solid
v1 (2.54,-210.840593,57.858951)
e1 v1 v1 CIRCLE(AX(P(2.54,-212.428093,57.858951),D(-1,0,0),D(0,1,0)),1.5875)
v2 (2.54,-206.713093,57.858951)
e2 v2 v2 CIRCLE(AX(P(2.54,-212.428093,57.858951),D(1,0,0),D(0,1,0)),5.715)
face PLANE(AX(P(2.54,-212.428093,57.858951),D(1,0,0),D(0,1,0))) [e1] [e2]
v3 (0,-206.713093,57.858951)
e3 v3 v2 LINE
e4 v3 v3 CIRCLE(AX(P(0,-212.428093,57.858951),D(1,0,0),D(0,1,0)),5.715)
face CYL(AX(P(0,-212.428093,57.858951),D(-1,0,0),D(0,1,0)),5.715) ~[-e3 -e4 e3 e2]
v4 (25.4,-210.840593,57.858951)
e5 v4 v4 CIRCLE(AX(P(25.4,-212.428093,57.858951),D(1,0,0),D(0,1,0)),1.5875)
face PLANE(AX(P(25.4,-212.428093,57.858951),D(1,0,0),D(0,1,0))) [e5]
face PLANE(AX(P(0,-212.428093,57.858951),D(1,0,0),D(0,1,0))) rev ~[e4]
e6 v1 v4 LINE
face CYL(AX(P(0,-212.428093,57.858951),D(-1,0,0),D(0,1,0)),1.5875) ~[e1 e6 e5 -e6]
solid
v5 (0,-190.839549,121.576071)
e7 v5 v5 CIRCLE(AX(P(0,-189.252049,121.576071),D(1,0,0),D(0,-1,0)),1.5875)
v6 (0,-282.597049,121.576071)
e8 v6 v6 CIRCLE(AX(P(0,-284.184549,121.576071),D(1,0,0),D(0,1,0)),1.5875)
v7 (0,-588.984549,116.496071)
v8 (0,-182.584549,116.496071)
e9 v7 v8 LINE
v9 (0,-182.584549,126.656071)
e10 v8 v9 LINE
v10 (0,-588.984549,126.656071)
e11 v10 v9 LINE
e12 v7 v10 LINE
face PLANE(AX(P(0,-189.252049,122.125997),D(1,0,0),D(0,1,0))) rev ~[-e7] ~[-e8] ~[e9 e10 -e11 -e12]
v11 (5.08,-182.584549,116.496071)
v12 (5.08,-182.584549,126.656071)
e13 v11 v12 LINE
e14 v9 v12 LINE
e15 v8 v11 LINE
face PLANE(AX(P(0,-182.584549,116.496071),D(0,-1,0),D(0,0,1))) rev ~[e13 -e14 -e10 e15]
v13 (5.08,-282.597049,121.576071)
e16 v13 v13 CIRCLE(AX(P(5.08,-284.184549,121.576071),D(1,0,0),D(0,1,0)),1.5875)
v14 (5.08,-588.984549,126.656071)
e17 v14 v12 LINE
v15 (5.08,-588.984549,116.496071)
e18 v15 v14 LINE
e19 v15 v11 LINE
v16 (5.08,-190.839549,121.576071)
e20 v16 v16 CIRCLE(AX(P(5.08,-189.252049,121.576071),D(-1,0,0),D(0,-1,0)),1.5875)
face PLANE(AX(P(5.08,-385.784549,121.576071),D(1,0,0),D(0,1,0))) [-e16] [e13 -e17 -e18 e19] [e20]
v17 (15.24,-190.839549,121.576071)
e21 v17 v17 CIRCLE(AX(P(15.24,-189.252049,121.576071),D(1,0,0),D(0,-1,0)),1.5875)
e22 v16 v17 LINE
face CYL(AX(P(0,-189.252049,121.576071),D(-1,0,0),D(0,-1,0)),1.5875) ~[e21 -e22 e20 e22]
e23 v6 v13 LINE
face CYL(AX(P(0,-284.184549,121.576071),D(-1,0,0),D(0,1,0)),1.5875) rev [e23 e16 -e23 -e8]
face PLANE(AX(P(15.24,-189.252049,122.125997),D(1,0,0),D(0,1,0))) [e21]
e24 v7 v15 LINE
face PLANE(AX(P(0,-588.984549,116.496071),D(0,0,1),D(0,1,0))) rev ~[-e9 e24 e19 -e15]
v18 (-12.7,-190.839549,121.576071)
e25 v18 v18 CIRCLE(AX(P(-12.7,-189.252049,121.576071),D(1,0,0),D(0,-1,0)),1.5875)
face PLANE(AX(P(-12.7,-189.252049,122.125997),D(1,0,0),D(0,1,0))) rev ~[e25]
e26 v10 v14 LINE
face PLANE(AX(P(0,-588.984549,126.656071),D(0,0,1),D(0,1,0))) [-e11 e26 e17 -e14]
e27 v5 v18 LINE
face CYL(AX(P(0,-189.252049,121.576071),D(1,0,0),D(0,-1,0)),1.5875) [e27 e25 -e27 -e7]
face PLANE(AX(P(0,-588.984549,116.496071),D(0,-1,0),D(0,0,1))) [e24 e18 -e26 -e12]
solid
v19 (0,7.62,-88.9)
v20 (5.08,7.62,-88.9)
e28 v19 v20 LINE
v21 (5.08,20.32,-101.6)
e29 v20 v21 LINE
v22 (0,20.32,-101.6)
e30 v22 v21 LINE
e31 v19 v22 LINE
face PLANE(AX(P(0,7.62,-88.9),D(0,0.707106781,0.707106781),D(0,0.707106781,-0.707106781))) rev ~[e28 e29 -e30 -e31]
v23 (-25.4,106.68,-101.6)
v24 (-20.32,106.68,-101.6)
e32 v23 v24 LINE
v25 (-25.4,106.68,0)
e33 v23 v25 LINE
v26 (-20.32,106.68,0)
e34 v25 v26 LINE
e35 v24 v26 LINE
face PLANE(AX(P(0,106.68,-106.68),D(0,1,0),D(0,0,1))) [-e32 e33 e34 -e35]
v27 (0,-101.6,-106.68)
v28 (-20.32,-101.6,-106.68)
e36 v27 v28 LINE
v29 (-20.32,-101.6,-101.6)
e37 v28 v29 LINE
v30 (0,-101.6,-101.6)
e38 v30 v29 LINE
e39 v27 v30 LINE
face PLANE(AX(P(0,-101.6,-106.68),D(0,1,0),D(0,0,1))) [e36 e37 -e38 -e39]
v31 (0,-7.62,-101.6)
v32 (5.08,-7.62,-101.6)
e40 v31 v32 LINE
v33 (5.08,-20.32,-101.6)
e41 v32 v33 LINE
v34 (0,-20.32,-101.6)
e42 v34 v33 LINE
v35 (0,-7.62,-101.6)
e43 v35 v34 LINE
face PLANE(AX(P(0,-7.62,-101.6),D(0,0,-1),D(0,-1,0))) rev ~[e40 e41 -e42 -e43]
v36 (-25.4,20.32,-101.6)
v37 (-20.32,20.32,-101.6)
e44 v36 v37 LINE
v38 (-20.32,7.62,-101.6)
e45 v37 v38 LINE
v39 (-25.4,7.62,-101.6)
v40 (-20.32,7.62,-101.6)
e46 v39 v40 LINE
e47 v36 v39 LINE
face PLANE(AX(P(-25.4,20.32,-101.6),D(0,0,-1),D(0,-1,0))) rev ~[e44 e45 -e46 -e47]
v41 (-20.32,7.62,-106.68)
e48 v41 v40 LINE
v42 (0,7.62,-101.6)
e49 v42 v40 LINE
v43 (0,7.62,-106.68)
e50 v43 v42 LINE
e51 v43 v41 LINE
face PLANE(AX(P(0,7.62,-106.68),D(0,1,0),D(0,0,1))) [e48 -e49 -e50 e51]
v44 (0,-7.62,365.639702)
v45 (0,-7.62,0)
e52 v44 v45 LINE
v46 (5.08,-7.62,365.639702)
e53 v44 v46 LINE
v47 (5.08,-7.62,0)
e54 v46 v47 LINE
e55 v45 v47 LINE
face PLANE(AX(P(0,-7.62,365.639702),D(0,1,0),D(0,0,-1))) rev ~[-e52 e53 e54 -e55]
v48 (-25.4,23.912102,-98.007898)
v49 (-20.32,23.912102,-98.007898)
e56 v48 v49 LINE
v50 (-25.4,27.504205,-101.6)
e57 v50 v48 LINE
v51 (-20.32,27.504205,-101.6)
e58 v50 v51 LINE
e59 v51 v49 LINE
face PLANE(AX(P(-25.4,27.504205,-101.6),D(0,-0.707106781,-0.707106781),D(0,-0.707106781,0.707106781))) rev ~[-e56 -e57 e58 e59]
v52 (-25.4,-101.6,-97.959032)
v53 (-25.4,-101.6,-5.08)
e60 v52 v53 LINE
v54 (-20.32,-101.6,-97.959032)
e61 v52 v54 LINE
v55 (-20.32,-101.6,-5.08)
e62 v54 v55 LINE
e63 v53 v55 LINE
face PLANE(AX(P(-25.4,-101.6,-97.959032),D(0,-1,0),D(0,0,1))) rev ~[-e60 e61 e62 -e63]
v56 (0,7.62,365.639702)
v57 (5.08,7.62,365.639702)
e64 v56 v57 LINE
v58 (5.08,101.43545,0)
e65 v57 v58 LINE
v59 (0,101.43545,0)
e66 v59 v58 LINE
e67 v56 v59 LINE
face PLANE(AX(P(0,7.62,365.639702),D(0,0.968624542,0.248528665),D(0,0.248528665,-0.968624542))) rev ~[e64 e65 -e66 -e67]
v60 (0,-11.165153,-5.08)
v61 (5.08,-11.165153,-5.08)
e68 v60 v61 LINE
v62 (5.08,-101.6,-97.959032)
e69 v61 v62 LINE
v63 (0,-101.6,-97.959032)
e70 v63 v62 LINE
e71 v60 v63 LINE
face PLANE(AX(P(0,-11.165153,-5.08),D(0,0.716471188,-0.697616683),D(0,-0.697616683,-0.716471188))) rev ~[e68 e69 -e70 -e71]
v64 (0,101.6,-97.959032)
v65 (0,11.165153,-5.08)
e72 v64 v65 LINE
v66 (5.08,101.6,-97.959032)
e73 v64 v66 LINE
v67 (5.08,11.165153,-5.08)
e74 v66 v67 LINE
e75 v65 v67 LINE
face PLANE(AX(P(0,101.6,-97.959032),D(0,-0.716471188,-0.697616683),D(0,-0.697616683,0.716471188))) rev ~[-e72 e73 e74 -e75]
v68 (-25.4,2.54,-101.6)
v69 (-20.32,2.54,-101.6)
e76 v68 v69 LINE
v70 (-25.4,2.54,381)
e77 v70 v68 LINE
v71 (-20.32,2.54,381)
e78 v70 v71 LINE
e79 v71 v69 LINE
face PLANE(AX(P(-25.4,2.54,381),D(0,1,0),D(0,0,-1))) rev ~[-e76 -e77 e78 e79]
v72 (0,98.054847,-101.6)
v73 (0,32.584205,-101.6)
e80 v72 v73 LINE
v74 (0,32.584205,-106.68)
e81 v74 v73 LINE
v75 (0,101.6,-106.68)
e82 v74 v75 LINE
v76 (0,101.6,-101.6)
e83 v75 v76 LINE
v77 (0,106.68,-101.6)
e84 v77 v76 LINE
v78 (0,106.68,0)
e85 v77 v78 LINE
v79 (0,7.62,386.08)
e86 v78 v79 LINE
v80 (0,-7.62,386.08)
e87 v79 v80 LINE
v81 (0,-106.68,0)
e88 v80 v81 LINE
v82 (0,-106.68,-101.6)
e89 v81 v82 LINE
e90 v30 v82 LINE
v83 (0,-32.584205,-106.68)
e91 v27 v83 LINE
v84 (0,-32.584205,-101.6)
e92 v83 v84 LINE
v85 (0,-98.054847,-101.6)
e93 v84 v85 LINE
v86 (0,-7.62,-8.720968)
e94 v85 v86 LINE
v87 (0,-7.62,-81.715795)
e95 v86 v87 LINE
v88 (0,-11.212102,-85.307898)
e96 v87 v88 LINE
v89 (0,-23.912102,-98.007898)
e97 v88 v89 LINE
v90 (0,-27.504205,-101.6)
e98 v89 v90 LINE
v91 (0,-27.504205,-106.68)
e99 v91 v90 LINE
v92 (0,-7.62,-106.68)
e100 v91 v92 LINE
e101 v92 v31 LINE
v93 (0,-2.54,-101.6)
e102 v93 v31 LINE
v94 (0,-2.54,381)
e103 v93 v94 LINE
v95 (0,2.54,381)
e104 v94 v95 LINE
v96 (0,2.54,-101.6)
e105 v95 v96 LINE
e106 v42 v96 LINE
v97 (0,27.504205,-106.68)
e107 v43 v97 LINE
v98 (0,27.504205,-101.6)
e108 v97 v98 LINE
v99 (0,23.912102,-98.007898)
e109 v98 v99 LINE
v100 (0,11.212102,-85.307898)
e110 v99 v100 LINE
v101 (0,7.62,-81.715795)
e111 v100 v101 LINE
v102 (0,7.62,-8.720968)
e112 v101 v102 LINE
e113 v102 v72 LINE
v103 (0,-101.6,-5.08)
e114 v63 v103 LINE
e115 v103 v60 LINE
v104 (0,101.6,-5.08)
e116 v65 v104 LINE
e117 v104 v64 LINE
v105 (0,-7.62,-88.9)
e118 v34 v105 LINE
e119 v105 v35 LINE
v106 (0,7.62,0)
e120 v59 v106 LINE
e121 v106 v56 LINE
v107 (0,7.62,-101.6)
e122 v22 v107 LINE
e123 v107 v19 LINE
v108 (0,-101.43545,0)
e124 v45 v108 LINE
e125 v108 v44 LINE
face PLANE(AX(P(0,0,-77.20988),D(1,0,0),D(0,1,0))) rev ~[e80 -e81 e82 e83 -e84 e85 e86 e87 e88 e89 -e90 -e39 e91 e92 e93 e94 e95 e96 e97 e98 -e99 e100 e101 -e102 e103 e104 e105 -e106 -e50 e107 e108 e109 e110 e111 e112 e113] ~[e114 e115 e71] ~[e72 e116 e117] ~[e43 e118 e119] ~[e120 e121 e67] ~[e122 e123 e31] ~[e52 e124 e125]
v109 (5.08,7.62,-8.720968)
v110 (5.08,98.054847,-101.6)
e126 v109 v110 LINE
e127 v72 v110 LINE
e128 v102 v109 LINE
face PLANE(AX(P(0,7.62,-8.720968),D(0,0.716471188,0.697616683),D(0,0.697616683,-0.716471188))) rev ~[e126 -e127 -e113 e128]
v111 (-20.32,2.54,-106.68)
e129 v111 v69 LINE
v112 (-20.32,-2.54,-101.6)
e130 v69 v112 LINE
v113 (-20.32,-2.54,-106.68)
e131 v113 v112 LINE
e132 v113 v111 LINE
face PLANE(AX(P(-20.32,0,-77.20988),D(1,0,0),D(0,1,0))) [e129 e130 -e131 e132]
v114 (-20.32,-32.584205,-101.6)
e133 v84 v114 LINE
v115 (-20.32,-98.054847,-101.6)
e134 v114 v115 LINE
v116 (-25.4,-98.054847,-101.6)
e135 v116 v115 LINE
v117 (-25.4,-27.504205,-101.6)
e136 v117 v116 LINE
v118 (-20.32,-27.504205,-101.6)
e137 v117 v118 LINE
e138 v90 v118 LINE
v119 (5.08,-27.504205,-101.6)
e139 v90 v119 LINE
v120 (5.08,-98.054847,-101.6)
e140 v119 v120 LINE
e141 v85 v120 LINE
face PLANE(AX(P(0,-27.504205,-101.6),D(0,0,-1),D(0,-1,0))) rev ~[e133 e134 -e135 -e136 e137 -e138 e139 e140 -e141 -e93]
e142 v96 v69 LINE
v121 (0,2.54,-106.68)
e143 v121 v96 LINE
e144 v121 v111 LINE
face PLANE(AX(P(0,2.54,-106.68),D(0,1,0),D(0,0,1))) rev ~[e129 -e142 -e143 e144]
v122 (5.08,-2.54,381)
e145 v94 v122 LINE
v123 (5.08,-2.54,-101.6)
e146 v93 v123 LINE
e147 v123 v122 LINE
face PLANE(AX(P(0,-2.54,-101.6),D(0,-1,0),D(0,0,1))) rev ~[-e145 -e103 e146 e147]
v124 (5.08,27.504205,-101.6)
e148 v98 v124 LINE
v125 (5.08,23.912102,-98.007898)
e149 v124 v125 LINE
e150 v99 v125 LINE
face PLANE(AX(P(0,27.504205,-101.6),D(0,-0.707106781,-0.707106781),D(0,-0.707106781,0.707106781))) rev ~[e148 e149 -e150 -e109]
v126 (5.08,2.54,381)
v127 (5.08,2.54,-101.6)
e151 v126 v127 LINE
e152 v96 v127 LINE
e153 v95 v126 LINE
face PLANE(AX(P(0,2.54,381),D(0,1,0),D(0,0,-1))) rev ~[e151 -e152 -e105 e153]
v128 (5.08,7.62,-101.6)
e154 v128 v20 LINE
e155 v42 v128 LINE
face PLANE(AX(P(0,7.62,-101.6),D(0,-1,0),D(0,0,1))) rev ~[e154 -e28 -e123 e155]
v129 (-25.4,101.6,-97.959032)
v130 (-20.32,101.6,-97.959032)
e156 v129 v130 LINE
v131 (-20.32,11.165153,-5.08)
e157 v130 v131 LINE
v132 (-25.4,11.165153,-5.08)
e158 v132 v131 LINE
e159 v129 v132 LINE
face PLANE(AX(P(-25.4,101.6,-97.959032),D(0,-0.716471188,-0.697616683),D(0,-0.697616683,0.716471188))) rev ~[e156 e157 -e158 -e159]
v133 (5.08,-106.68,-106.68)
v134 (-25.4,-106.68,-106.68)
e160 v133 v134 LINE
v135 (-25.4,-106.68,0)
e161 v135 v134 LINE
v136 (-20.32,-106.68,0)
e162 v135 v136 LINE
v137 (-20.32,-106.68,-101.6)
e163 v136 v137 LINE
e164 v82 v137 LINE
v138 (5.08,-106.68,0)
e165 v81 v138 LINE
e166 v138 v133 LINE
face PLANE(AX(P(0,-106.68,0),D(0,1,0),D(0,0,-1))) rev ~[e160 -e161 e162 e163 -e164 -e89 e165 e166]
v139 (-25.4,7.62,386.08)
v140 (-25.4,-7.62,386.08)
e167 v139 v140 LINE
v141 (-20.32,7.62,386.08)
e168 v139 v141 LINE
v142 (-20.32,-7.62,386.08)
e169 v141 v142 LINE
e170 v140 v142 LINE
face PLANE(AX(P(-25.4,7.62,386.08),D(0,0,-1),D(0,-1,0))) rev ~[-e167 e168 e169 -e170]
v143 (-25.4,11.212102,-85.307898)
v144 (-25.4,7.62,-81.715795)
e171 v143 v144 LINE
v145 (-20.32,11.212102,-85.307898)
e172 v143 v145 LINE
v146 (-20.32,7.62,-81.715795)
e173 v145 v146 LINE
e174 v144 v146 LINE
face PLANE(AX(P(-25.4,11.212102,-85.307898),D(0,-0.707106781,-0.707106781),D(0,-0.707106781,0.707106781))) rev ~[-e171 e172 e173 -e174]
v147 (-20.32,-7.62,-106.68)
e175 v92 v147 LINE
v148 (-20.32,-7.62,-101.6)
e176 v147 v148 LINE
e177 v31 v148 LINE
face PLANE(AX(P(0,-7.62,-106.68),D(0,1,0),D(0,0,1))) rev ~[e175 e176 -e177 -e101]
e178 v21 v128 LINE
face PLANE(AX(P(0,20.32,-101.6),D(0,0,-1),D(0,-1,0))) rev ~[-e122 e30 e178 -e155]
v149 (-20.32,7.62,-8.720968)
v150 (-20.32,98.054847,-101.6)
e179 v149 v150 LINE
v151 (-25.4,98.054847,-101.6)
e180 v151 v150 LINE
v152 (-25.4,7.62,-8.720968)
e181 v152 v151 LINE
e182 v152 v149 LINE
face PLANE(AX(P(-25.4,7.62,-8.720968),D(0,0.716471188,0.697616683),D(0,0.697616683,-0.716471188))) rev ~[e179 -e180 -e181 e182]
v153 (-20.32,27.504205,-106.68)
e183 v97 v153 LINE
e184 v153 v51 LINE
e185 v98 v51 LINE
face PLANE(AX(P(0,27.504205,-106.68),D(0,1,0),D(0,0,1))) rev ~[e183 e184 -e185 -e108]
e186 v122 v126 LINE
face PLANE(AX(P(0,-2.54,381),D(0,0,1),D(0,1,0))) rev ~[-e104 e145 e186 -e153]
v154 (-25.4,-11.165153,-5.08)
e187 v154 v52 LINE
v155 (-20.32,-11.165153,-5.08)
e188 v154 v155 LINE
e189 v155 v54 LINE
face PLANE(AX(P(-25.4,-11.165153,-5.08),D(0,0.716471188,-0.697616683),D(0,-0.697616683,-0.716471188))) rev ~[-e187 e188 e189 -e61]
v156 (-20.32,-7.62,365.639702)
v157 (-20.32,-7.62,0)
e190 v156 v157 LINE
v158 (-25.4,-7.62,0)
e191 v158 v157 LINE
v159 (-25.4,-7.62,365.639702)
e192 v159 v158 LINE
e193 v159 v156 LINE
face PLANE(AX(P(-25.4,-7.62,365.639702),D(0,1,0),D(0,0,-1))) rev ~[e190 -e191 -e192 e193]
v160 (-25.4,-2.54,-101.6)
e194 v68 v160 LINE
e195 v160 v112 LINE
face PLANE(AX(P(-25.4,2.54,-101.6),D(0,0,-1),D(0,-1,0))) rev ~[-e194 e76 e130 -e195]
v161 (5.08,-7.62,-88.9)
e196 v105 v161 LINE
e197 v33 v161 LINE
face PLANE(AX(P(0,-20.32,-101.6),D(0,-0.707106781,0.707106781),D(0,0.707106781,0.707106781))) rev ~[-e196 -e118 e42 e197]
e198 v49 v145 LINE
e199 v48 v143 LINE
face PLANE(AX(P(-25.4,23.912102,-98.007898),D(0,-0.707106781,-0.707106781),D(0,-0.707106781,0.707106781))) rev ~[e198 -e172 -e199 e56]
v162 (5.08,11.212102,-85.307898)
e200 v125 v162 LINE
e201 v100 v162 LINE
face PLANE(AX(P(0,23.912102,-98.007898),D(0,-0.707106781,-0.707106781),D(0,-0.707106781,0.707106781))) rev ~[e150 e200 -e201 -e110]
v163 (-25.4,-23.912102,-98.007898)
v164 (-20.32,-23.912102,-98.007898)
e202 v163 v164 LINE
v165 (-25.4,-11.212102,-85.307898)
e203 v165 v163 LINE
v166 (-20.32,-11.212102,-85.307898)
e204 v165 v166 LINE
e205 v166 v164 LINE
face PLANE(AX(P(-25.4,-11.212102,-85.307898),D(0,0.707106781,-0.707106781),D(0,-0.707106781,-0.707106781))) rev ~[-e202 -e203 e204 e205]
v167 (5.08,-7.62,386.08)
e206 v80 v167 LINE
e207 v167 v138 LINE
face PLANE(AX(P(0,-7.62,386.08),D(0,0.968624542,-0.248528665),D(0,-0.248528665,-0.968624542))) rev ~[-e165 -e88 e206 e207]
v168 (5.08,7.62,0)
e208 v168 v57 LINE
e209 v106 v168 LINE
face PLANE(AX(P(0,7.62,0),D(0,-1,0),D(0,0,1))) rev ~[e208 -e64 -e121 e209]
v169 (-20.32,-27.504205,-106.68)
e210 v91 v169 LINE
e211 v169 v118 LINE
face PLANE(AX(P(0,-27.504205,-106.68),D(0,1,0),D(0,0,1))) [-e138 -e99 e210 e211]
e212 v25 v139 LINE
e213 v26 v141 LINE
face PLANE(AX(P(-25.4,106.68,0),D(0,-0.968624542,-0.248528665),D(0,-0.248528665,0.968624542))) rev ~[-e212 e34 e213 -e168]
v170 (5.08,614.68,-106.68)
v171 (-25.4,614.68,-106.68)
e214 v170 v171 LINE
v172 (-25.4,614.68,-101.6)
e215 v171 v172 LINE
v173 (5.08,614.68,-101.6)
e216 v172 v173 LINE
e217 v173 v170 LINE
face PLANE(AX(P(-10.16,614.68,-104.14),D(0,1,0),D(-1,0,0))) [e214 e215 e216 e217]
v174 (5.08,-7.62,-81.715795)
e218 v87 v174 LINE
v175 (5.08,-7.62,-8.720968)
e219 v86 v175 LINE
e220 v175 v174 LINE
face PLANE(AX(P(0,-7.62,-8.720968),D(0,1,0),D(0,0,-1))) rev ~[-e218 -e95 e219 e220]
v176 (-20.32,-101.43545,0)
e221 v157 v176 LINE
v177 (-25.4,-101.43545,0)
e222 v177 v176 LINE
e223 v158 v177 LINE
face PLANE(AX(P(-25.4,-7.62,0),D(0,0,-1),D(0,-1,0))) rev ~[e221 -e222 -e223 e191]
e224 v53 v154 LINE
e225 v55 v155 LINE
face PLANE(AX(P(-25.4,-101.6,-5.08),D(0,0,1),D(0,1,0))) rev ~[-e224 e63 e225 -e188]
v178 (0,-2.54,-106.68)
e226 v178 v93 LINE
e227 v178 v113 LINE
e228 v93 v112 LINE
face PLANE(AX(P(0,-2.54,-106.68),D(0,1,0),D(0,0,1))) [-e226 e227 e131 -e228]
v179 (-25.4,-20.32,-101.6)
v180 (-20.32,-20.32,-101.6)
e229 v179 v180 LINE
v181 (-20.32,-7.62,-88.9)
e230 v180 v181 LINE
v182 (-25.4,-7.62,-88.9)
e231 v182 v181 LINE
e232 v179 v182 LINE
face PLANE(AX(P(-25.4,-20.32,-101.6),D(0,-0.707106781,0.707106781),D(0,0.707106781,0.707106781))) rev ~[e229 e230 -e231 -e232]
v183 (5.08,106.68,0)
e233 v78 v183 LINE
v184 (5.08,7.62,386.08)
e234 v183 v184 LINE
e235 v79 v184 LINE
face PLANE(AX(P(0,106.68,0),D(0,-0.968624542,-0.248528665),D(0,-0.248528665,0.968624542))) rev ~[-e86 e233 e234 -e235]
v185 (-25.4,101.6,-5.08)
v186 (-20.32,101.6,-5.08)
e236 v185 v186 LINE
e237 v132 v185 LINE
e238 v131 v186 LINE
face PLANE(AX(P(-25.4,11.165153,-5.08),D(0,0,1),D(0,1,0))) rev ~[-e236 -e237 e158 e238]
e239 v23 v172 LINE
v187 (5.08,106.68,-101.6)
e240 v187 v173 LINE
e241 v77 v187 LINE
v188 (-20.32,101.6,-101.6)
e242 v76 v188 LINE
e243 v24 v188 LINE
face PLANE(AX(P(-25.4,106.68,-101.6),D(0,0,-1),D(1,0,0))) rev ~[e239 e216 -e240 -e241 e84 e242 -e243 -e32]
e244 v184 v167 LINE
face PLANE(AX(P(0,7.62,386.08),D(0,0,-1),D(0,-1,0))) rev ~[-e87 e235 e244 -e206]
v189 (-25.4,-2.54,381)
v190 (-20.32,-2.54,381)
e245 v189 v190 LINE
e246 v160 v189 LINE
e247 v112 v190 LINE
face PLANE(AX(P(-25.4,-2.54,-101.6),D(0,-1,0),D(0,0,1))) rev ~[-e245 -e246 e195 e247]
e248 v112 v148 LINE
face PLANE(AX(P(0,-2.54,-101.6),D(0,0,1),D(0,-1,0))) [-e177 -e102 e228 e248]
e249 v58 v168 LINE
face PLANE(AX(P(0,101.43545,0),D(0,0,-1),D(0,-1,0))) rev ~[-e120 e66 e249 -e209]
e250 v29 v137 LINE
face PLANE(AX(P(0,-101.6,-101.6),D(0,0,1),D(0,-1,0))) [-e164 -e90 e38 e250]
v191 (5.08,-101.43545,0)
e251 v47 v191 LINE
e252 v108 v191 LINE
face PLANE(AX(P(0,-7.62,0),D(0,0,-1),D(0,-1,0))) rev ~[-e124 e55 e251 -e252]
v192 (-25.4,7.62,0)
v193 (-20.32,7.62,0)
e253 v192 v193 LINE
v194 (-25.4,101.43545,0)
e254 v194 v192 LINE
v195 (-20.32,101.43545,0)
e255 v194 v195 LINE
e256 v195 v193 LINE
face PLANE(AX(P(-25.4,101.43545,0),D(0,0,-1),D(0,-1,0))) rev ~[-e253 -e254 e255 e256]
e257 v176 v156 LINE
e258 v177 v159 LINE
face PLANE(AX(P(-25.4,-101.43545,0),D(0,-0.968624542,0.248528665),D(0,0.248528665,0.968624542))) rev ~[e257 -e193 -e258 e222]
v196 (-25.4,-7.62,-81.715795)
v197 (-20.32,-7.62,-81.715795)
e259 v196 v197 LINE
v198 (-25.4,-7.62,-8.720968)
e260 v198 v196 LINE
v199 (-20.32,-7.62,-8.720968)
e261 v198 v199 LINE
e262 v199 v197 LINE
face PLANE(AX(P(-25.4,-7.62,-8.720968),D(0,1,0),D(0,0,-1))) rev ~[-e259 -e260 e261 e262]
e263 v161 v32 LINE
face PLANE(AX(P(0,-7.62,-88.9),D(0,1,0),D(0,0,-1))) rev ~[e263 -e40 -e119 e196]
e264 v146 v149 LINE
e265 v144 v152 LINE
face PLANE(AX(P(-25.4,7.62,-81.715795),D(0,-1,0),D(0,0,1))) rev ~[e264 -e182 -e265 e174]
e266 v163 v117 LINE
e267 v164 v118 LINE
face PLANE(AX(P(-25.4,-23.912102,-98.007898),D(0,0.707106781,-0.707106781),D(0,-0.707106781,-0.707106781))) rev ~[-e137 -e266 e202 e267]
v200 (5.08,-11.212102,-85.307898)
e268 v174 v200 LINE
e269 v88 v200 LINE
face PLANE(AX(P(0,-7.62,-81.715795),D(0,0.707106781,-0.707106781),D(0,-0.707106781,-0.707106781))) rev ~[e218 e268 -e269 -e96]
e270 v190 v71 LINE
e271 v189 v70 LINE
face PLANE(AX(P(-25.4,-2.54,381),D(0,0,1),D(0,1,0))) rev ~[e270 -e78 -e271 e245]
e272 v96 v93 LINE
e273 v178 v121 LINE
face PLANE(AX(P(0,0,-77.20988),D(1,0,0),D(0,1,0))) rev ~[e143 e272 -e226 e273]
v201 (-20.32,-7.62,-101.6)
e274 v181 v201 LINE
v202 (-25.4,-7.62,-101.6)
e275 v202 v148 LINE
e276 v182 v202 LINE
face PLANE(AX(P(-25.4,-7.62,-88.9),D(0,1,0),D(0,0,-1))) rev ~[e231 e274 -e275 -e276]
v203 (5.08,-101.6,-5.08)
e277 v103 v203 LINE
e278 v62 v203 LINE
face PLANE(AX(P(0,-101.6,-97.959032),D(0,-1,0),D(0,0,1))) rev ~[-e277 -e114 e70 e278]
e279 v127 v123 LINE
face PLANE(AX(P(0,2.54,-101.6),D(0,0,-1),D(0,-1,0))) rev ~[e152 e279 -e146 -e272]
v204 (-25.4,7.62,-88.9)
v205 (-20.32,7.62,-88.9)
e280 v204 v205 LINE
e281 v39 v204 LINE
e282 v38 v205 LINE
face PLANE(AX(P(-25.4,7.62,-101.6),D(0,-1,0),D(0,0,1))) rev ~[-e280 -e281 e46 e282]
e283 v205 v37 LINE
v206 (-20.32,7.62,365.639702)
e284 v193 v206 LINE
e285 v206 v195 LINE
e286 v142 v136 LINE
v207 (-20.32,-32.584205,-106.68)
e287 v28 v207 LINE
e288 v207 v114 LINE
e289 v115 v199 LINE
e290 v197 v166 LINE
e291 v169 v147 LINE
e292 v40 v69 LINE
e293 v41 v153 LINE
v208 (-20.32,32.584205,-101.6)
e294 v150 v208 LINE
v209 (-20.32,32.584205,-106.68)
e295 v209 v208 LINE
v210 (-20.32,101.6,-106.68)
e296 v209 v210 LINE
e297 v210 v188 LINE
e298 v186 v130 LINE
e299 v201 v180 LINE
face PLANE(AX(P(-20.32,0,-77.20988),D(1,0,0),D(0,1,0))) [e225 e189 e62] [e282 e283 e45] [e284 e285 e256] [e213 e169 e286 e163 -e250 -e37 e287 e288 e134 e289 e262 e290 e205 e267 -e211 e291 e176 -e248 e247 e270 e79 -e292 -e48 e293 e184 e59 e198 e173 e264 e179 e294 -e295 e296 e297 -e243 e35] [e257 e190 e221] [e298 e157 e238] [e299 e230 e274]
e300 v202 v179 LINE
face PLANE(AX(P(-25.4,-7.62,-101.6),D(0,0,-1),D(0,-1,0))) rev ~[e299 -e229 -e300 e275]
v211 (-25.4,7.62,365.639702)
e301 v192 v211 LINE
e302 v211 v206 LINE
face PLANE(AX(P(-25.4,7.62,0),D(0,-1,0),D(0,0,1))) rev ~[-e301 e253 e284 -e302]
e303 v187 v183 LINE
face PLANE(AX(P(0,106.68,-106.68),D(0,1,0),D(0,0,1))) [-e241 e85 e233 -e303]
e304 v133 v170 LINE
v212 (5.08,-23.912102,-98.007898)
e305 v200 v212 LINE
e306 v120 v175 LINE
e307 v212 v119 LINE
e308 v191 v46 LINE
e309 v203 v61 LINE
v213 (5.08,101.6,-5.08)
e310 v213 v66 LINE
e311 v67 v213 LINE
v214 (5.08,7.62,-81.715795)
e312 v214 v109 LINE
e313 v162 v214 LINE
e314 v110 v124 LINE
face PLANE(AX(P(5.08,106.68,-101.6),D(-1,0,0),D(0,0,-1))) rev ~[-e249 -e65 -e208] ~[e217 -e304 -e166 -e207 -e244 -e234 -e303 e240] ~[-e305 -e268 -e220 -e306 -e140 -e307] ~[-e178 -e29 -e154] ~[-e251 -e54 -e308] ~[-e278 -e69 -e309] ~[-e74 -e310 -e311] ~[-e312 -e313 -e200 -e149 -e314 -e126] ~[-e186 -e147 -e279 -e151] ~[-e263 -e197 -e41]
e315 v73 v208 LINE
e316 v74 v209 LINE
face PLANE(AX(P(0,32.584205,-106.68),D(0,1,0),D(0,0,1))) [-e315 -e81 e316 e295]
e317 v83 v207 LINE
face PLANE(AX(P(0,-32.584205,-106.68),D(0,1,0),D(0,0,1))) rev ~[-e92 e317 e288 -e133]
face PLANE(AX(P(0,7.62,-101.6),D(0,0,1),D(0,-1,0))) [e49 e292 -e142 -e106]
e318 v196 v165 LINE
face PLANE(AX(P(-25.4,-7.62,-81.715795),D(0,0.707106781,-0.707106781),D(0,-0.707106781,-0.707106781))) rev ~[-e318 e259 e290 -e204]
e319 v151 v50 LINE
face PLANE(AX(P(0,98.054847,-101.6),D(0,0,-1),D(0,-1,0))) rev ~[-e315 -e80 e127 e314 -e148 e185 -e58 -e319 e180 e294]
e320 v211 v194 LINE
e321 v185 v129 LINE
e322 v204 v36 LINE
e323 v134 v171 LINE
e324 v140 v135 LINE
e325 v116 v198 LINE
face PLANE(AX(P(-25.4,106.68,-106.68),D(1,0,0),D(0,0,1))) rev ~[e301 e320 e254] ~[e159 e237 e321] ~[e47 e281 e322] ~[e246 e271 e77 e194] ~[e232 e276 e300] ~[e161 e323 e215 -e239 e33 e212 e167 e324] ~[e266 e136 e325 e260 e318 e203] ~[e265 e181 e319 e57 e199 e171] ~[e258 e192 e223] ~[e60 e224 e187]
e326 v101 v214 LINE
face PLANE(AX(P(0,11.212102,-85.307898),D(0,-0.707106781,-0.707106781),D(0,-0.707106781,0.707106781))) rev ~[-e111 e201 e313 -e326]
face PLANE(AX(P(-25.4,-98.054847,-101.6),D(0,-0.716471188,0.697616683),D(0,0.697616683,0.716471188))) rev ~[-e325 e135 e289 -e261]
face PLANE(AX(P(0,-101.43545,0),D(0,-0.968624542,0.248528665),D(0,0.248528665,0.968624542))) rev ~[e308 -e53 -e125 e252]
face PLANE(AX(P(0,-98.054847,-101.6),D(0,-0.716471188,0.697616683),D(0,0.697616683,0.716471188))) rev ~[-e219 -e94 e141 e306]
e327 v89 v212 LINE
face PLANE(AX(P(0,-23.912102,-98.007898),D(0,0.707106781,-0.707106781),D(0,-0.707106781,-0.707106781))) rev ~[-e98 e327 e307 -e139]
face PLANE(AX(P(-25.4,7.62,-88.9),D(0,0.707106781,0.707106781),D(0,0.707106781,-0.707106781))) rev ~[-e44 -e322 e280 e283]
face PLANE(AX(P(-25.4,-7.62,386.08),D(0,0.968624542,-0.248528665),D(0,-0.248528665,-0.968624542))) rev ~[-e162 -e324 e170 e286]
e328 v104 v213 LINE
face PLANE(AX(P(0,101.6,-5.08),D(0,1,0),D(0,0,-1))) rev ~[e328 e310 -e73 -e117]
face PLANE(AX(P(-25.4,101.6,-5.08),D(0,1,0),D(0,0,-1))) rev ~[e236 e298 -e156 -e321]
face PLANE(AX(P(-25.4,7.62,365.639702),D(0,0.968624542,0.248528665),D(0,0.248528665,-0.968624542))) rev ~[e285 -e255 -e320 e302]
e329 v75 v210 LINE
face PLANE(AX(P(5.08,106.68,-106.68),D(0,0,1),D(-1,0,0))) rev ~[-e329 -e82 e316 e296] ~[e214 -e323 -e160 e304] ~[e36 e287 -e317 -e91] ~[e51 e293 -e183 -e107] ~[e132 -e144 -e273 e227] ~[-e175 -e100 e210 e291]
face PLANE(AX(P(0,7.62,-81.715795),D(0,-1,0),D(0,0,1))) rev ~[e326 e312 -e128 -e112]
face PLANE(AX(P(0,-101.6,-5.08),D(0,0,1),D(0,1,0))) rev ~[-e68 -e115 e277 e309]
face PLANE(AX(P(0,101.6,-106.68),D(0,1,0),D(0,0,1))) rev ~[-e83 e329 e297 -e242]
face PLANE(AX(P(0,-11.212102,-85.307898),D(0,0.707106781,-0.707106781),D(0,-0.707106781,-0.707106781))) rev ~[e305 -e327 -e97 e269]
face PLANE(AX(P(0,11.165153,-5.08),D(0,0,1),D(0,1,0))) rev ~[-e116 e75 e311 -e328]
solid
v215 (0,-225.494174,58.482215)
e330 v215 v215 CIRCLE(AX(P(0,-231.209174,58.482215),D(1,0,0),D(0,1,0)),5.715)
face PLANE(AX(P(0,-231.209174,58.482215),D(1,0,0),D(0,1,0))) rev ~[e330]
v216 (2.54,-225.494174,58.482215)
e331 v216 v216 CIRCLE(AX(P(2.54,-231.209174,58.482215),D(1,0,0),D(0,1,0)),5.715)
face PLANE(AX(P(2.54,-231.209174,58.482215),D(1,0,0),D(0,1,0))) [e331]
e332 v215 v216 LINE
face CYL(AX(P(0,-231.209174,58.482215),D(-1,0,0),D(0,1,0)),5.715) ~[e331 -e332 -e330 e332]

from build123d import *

# Parameters (mm, degrees)
F0_W      = 5.08
F0_H      = 5.08
F1_DEPTH  = 5.08
F4_W      = 5.08
F4_H      = 5.08
F5_DEPTH  = 20.32
F6_W      = 406.4
F6_H      = 10.16
F6_R      = 1.5875
F7_DEPTH  = 5.08
F8_R      = 5.715
F8_R_2    = 1.5875
F9_DEPTH  = 2.54
F10_DEPTH = 25.4
F11_R     = 5.715
F12_DEPTH = 2.54
F15_DEPTH = 15.24
F16_DEPTH = 12.7
F18_DEPTH = 508


# Not quite as in the source:
# - the program builds the solid bodies; features that only make, move or delete a surface that nothing else refers to are left out


with BuildPart() as f1:
    # F0 (on Right) → F1 (new body)
    with BuildSketch(Plane.YZ):
        Polygon((2.54, -101.6), (0, -101.6), (-2.54, -101.6), (-7.62, -101.6), (-20.32, -101.6), (-27.5042048969, -101.6), (-98.0548469748, -101.6), (-101.6, -101.6), (-101.6, -97.9590320281), (-101.6, -5.08), (-101.6, 0), (-106.68, 0), (-106.68, -106.68), (0, -106.68), (106.68, -106.68), (106.68, 0), (101.6, 0), (101.6, -5.08), (101.6, -97.9590320281), (101.6, -101.6), (98.0548469748, -101.6), (27.5042048969, -101.6), (20.32, -101.6), (7.62, -101.6), align=None)
        Polygon((101.4354498343, 0), (7.62, 0), (7.62, -5.08), (11.1651530252, -5.08), (101.6, -5.08), (101.6, 0), align=None)
        Polygon((-7.62, -5.08), (-7.62, 0), (-101.4354498343, 0), (-101.6, 0), (-101.6, -5.08), (-11.1651530252, -5.08), align=None)
        Polygon((2.54, 381), (2.54, 0), (7.62, 0), (7.62, 365.6397019183), (7.62, 381), align=None)
        Polygon((-7.62, 0), (-2.54, 0), (-2.54, 381), (-7.62, 381), (-7.62, 365.6397019183), align=None)
        Polygon((-2.54, 381), (2.54, 381), (7.62, 381), (7.62, 386.08), (-7.62, 386.08), (-7.62, 381), align=None)
        Polygon((-2.54, -101.6), (-2.54, -5.08), (-7.62, -5.08), (-7.62, -8.7209679719), (-7.62, -81.7157951031), (-7.62, -88.9), (-7.62, -101.6), align=None)
        Polygon((-7.62, -8.7209679719), (-7.62, -5.08), (-11.1651530252, -5.08), (-101.6, -97.9590320281), (-101.6, -101.6), (-98.0548469748, -101.6), align=None)
        with Locations((5.08, -2.54)):
            Rectangle(F0_W, F0_H)
        with Locations((-5.08, -2.54)):
            Rectangle(F0_W, F0_H)
        Polygon((7.62, -5.08), (2.54, -5.08), (2.54, -101.6), (7.62, -101.6), (7.62, -88.9), (7.62, -81.7157951031), (7.62, -8.7209679719), align=None)
        Polygon((11.1651530252, -5.08), (7.62, -5.08), (7.62, -8.7209679719), (98.0548469748, -101.6), (101.6, -101.6), (101.6, -97.9590320281), align=None)
        Polygon((11.2121024484, -85.3078975516), (7.62, -81.7157951031), (7.62, -88.9), (20.32, -101.6), (27.5042048969, -101.6), (23.9121024484, -98.0078975516), align=None)
        Polygon((-27.5042048969, -101.6), (-20.32, -101.6), (-7.62, -88.9), (-7.62, -81.7157951031), (-11.2121024484, -85.3078975516), (-23.9121024484, -98.0078975516), align=None)
        Polygon((7.62, 365.6397019183), (101.4354498343, 0), (101.6, 0), (106.68, 0), (7.62, 386.08), (7.62, 381), align=None)
        Polygon((-101.6, 0), (-101.4354498343, 0), (-7.62, 365.6397019183), (-7.62, 381), (-7.62, 386.08), (-106.68, 0), align=None)
    extrude(amount=F1_DEPTH)


with BuildPart() as f2_1:
    # F2: copy of F1
    add(f1.part)


with BuildPart() as f2_1_1:
    # F3: moved
    add(f2_1.part.moved(Location((-25.4, 0, 0))))


with BuildPart() as f1_1:
    add(f1.part)

    add(f2_1_1.part)  # F5 merges F2_1
    # F4 (on face) → F5 (join, through all)
    with BuildSketch(Plane(origin=(0, 0, 0), x_dir=(0, -1, 0), z_dir=(-1, 0, 0))):
        with Locations((-104.14, -104.14)):
            Rectangle(F4_W, F4_H)
        with Locations((-30.0442048969, -104.14)):
            Rectangle(F4_W, F4_H)
        with Locations((-5.08, -104.14)):
            Rectangle(F4_W, F4_H)
        with Locations((5.08, -104.14)):
            Rectangle(F4_W, F4_H)
        with Locations((30.0442048969, -104.14)):
            Rectangle(F4_W, F4_H)
        with Locations((104.14, -104.14)):
            Rectangle(F4_W, F4_H)
    extrude(amount=F5_DEPTH)

    # F17 (on face) → F18 (join)
    with BuildSketch(Plane(origin=(0, 106.68, 0), x_dir=(-1, 0, 0), z_dir=(0, 1, 0))):
        Polygon((0, -101.6), (-5.08, -101.6), (-5.08, -106.68), (25.4, -106.68), (25.4, -101.6), (20.32, -101.6), align=None)
    extrude(amount=F18_DEPTH)


with BuildPart() as f7:
    # F6 (on Right) → F7 (new body)
    with BuildSketch(Plane.YZ):
        with Locations((-385.7845490456, 121.5760712194)):
            Rectangle(F6_W, F6_H)
        with Locations((-284.1845490456, 121.5760712194)):
            Circle(F6_R, mode=Mode.SUBTRACT)
        with BuildLine():
            ThreePointArc((-190.8395490456, 121.5760712194), (-189.2520490456, 123.1635712194), (-187.6645490456, 121.5760712194))
            ThreePointArc((-187.6645490456, 121.5760712194), (-189.2520490456, 119.9885712194), (-190.8395490456, 121.5760712194))
        make_face(mode=Mode.SUBTRACT)
        with BuildLine():
            ThreePointArc((-190.8395490456, 121.5760712194), (-189.2520490456, 119.9885712194), (-187.6645490456, 121.5760712194))
            Line((-187.6645490456, 121.5760712194), (-190.8395490456, 121.5760712194))
        make_face()
        with BuildLine():
            Line((-190.8395490456, 121.5760712194), (-187.6645490456, 121.5760712194))
            ThreePointArc((-187.6645490456, 121.5760712194), (-189.2520490456, 123.1635712194), (-190.8395490456, 121.5760712194))
        make_face()
    extrude(amount=F7_DEPTH)

    # F6 (on Right) → F15 (join)
    with BuildSketch(Plane.YZ):
        with BuildLine():
            Line((-190.8395490456, 121.5760712194), (-187.6645490456, 121.5760712194))
            ThreePointArc((-187.6645490456, 121.5760712194), (-189.2520490456, 123.1635712194), (-190.8395490456, 121.5760712194))
        make_face()
        with BuildLine():
            ThreePointArc((-190.8395490456, 121.5760712194), (-189.2520490456, 119.9885712194), (-187.6645490456, 121.5760712194))
            Line((-187.6645490456, 121.5760712194), (-190.8395490456, 121.5760712194))
        make_face()
    extrude(amount=F15_DEPTH)

    # F6 (on Right) → F16 (join)
    with BuildSketch(Plane.YZ):
        with BuildLine():
            Line((-190.8395490456, 121.5760712194), (-187.6645490456, 121.5760712194))
            ThreePointArc((-187.6645490456, 121.5760712194), (-189.2520490456, 123.1635712194), (-190.8395490456, 121.5760712194))
        make_face()
        with BuildLine():
            ThreePointArc((-190.8395490456, 121.5760712194), (-189.2520490456, 119.9885712194), (-187.6645490456, 121.5760712194))
            Line((-187.6645490456, 121.5760712194), (-190.8395490456, 121.5760712194))
        make_face()
    extrude(amount=-F16_DEPTH)


with BuildPart() as f9:
    # F8 (on Right) → F9 (new body)
    with BuildSketch(Plane.YZ):
        with Locations((-212.4280929565, 57.8589513898)):
            Circle(F8_R)
        with Locations((-212.4280929565, 57.8589513898)):
            Circle(F8_R_2, mode=Mode.SUBTRACT)
        with Locations((-212.4280929565, 57.8589513898)):
            Circle(F8_R_2)
    extrude(amount=F9_DEPTH)

    # F8 (on Right) → F10 (join)
    with BuildSketch(Plane.YZ):
        with Locations((-212.4280929565, 57.8589513898)):
            Circle(F8_R_2)
    extrude(amount=F10_DEPTH)


with BuildPart() as f12:
    # F11 (on Right) → F12 (new body)
    with BuildSketch(Plane.YZ):
        with Locations((-231.2091737986, 58.4822148085)):
            Circle(F11_R)
    extrude(amount=F12_DEPTH)


solid = Compound([f1_1.part, f7.part, f9.part, f12.part])
